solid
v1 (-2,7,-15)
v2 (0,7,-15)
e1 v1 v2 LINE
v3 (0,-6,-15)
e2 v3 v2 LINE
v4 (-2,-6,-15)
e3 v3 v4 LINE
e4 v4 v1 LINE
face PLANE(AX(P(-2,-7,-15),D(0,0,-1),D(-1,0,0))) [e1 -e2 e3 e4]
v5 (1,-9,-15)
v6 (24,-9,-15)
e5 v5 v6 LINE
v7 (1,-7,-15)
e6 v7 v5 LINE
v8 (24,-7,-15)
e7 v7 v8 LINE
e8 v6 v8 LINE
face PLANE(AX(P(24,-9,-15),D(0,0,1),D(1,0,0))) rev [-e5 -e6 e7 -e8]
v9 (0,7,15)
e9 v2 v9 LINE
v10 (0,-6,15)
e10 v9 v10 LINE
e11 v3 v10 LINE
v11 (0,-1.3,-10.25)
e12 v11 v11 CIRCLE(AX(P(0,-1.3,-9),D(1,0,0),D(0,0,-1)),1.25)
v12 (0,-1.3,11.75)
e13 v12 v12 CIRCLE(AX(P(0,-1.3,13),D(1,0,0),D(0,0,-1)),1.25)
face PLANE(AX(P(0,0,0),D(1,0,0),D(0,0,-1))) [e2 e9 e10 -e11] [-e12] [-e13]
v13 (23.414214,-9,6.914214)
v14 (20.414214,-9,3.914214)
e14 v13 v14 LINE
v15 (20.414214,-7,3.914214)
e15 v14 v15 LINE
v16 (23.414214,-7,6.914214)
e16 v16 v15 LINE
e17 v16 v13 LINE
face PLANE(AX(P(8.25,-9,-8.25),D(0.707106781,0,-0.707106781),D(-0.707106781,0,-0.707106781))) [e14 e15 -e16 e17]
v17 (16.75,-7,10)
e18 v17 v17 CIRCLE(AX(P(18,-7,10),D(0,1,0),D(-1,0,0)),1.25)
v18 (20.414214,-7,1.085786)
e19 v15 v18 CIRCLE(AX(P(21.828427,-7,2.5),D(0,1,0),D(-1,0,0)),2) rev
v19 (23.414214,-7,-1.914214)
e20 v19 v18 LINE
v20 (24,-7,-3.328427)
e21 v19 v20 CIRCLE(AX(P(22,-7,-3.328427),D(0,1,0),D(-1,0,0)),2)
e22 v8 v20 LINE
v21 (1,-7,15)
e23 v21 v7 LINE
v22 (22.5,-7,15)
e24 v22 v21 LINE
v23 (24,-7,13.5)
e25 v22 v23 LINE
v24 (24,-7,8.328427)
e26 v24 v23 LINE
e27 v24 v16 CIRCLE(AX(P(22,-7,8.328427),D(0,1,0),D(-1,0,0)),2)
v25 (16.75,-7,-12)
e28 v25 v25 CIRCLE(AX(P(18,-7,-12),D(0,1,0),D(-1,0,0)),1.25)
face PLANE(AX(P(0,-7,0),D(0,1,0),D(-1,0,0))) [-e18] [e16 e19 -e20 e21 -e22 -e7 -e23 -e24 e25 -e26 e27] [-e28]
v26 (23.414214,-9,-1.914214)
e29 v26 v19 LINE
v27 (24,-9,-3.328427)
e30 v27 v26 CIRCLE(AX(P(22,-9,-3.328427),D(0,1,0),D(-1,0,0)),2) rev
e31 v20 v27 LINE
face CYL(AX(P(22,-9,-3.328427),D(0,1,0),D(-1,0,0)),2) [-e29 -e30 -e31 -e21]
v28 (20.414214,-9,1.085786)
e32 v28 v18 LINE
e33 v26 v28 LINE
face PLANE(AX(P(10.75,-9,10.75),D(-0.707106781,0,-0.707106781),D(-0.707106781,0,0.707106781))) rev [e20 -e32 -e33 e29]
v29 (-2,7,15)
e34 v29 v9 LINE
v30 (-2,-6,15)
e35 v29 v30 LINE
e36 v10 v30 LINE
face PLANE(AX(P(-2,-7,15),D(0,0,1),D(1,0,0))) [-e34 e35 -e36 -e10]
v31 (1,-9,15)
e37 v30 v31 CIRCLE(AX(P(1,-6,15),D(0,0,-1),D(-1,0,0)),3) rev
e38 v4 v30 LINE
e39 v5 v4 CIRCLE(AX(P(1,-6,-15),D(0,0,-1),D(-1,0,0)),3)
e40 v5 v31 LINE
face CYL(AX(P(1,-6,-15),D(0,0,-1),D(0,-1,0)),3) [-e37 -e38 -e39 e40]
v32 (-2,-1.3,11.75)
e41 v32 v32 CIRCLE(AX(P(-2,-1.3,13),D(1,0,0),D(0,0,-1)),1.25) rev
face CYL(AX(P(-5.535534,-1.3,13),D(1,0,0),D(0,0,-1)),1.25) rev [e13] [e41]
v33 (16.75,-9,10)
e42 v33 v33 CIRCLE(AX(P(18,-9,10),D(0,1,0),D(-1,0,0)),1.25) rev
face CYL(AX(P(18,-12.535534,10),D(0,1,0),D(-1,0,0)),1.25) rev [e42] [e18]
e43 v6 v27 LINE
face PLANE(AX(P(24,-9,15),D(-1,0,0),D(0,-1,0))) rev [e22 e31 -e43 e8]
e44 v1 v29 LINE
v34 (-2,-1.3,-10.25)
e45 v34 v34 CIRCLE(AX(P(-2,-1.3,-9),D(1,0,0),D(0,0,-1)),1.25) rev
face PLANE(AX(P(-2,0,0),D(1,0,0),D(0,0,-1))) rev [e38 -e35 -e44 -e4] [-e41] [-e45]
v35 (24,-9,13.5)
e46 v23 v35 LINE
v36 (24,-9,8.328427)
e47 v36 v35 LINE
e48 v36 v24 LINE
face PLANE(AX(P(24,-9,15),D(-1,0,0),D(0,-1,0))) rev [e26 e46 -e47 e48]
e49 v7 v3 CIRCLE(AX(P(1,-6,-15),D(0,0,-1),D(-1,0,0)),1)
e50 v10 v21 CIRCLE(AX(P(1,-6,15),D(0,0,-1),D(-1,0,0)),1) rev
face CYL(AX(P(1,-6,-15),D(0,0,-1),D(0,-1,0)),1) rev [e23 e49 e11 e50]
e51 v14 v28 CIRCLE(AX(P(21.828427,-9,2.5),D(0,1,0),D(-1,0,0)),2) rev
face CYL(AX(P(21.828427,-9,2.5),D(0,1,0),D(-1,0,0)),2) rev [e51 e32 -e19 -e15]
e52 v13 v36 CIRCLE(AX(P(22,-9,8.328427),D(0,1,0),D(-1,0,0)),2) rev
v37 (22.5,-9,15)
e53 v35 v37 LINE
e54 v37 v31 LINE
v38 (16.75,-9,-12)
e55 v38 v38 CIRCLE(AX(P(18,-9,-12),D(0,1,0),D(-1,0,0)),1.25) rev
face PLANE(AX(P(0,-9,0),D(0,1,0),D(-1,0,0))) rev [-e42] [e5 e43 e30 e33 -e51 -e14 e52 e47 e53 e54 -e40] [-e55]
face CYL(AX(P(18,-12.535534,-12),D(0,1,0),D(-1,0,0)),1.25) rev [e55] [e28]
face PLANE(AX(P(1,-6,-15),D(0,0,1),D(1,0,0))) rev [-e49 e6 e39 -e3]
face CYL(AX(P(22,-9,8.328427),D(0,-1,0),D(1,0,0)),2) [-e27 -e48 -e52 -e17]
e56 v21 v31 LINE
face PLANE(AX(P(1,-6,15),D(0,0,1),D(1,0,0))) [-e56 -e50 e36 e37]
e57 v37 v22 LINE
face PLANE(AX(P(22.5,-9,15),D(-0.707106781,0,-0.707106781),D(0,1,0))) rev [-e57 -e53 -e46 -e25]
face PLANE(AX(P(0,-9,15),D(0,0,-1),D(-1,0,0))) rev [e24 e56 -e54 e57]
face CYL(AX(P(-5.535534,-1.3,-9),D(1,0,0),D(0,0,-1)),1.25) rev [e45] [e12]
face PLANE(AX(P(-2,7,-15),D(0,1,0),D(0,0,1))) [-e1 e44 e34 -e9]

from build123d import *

# Parameters (mm, degrees)
ESBO_O1_W                      = 30
ESBO_O1_H                      = 14
FLANGE_BASE1_DEPTH             = 2
ARESTA_FLANGE1_STRIP_W         = 10
ARESTA_FLANGE1_STRIP_H         = 2
ARESTA_FLANGE1_STRIP_CUT_DEPTH = 30
ARESTA_FLANGE1_DEPTH           = 30
ESBO_O10_R                     = 1.25
CORTE_EXTRUS_O1_DEPTH          = 2
ESBO_O11_R                     = 1.25
CORTE_EXTRUS_O2_DEPTH          = 2
CHANFRO1_SIZE                  = 1.5
CORTE_EXTRUS_O3_DEPTH          = 2
FILETE1_R                      = 2


# Sheet-metal steps are written as plain solids
with BuildPart() as part:
    # Esboço1 → Flange-base1 (new body)
    with BuildSketch(Plane(origin=(0, 0, 0), x_dir=(0, 0, -1), z_dir=(1, 0, 0))):
        Rectangle(ESBO_O1_W, ESBO_O1_H)
    extrude(amount=-FLANGE_BASE1_DEPTH)

    # Aresta-Flange1 strip (across the edge) → Aresta-Flange1 strip cut (cut)
    with BuildSketch(Plane(origin=(0, -7, 15), x_dir=(0, 1, 0), z_dir=(0, 0, -1))):
        with Locations((-4, -1)):
            Rectangle(ARESTA_FLANGE1_STRIP_W, ARESTA_FLANGE1_STRIP_H)
    extrude(amount=ARESTA_FLANGE1_STRIP_CUT_DEPTH, mode=Mode.SUBTRACT)

    # Aresta-Flange1 section (across the edge) → Aresta-Flange1 (add)
    with BuildSketch(Plane(origin=(0, -7, 15), x_dir=(0, 1, 0), z_dir=(0, 0, -1))):
        with BuildLine():
            Line((-2, 1), (-2, 24))
            Line((-2, 24), (0, 24))
            Line((0, 24), (0, 1))
            ThreePointArc((0, 1), (0.292893219, 0.292893219), (1, 0))
            Line((1, 0), (1, -2))
            ThreePointArc((1, -2), (-1.121320344, -1.121320344), (-2, 1))
        make_face()
    extrude(amount=ARESTA_FLANGE1_DEPTH)

    # Esboço10 → Corte-extrusão1 (cut)
    with BuildSketch(Plane(origin=(0, 0, 0), x_dir=(0, 0, -1), z_dir=(1, 0, 0))):
        with Locations((-13, -1.3)):
            Circle(ESBO_O10_R)
        with Locations((9, -1.3)):
            Circle(ESBO_O10_R)
    extrude(amount=-CORTE_EXTRUS_O1_DEPTH, mode=Mode.SUBTRACT)

    # Esboço11 → Corte-extrusão2 (cut)
    with BuildSketch(Plane(origin=(0, -7, 0), x_dir=(1, 0, 0), z_dir=(0, 1, 0))):
        with Locations(Location((18, -10, 0), (0, 0, 180))):
            Circle(ESBO_O11_R)
        with Locations(Location((18, 12, 0), (0, 0, 180))):
            Circle(ESBO_O11_R)
    extrude(amount=-CORTE_EXTRUS_O2_DEPTH, mode=Mode.SUBTRACT)

    # Chanfro1
    chanfro1_edges = [part.edges().sort_by_distance(p)[0] for p in [
        (24, -8, 15),
    ]]
    chamfer(chanfro1_edges, length=CHANFRO1_SIZE)

    # Esboço12 → Corte-extrusão3 (cut)
    with BuildSketch(Plane(origin=(0, -7, 0), x_dir=(1, 0, 0), z_dir=(0, 1, 0))):
        with BuildLine():
            Line((19.828427125, -2.5), (24, -2.5))
            Line((24, -2.5), (24, 2.5))
            Line((24, 2.5), (20.414213562, -1.085786438))
            ThreePointArc((20.414213562, -1.085786438), (19.98066806, -1.734633135), (19.828427125, -2.5))
        make_face()
        with BuildLine():
            Line((24, -7.5), (24, -2.5))
            Line((24, -2.5), (19.828427125, -2.5))
            ThreePointArc((19.828427125, -2.5), (19.98066806, -3.265366865), (20.414213562, -3.914213562))
            Line((20.414213562, -3.914213562), (24, -7.5))
        make_face()
    extrude(amount=-CORTE_EXTRUS_O3_DEPTH, mode=Mode.SUBTRACT)

    # Filete1
    filete1_edges = [part.edges().sort_by_distance(p)[0] for p in [
        (24, -8, -2.5),
        (24, -8, 7.5),
    ]]
    fillet(filete1_edges, radius=FILETE1_R)


solid = part.part
